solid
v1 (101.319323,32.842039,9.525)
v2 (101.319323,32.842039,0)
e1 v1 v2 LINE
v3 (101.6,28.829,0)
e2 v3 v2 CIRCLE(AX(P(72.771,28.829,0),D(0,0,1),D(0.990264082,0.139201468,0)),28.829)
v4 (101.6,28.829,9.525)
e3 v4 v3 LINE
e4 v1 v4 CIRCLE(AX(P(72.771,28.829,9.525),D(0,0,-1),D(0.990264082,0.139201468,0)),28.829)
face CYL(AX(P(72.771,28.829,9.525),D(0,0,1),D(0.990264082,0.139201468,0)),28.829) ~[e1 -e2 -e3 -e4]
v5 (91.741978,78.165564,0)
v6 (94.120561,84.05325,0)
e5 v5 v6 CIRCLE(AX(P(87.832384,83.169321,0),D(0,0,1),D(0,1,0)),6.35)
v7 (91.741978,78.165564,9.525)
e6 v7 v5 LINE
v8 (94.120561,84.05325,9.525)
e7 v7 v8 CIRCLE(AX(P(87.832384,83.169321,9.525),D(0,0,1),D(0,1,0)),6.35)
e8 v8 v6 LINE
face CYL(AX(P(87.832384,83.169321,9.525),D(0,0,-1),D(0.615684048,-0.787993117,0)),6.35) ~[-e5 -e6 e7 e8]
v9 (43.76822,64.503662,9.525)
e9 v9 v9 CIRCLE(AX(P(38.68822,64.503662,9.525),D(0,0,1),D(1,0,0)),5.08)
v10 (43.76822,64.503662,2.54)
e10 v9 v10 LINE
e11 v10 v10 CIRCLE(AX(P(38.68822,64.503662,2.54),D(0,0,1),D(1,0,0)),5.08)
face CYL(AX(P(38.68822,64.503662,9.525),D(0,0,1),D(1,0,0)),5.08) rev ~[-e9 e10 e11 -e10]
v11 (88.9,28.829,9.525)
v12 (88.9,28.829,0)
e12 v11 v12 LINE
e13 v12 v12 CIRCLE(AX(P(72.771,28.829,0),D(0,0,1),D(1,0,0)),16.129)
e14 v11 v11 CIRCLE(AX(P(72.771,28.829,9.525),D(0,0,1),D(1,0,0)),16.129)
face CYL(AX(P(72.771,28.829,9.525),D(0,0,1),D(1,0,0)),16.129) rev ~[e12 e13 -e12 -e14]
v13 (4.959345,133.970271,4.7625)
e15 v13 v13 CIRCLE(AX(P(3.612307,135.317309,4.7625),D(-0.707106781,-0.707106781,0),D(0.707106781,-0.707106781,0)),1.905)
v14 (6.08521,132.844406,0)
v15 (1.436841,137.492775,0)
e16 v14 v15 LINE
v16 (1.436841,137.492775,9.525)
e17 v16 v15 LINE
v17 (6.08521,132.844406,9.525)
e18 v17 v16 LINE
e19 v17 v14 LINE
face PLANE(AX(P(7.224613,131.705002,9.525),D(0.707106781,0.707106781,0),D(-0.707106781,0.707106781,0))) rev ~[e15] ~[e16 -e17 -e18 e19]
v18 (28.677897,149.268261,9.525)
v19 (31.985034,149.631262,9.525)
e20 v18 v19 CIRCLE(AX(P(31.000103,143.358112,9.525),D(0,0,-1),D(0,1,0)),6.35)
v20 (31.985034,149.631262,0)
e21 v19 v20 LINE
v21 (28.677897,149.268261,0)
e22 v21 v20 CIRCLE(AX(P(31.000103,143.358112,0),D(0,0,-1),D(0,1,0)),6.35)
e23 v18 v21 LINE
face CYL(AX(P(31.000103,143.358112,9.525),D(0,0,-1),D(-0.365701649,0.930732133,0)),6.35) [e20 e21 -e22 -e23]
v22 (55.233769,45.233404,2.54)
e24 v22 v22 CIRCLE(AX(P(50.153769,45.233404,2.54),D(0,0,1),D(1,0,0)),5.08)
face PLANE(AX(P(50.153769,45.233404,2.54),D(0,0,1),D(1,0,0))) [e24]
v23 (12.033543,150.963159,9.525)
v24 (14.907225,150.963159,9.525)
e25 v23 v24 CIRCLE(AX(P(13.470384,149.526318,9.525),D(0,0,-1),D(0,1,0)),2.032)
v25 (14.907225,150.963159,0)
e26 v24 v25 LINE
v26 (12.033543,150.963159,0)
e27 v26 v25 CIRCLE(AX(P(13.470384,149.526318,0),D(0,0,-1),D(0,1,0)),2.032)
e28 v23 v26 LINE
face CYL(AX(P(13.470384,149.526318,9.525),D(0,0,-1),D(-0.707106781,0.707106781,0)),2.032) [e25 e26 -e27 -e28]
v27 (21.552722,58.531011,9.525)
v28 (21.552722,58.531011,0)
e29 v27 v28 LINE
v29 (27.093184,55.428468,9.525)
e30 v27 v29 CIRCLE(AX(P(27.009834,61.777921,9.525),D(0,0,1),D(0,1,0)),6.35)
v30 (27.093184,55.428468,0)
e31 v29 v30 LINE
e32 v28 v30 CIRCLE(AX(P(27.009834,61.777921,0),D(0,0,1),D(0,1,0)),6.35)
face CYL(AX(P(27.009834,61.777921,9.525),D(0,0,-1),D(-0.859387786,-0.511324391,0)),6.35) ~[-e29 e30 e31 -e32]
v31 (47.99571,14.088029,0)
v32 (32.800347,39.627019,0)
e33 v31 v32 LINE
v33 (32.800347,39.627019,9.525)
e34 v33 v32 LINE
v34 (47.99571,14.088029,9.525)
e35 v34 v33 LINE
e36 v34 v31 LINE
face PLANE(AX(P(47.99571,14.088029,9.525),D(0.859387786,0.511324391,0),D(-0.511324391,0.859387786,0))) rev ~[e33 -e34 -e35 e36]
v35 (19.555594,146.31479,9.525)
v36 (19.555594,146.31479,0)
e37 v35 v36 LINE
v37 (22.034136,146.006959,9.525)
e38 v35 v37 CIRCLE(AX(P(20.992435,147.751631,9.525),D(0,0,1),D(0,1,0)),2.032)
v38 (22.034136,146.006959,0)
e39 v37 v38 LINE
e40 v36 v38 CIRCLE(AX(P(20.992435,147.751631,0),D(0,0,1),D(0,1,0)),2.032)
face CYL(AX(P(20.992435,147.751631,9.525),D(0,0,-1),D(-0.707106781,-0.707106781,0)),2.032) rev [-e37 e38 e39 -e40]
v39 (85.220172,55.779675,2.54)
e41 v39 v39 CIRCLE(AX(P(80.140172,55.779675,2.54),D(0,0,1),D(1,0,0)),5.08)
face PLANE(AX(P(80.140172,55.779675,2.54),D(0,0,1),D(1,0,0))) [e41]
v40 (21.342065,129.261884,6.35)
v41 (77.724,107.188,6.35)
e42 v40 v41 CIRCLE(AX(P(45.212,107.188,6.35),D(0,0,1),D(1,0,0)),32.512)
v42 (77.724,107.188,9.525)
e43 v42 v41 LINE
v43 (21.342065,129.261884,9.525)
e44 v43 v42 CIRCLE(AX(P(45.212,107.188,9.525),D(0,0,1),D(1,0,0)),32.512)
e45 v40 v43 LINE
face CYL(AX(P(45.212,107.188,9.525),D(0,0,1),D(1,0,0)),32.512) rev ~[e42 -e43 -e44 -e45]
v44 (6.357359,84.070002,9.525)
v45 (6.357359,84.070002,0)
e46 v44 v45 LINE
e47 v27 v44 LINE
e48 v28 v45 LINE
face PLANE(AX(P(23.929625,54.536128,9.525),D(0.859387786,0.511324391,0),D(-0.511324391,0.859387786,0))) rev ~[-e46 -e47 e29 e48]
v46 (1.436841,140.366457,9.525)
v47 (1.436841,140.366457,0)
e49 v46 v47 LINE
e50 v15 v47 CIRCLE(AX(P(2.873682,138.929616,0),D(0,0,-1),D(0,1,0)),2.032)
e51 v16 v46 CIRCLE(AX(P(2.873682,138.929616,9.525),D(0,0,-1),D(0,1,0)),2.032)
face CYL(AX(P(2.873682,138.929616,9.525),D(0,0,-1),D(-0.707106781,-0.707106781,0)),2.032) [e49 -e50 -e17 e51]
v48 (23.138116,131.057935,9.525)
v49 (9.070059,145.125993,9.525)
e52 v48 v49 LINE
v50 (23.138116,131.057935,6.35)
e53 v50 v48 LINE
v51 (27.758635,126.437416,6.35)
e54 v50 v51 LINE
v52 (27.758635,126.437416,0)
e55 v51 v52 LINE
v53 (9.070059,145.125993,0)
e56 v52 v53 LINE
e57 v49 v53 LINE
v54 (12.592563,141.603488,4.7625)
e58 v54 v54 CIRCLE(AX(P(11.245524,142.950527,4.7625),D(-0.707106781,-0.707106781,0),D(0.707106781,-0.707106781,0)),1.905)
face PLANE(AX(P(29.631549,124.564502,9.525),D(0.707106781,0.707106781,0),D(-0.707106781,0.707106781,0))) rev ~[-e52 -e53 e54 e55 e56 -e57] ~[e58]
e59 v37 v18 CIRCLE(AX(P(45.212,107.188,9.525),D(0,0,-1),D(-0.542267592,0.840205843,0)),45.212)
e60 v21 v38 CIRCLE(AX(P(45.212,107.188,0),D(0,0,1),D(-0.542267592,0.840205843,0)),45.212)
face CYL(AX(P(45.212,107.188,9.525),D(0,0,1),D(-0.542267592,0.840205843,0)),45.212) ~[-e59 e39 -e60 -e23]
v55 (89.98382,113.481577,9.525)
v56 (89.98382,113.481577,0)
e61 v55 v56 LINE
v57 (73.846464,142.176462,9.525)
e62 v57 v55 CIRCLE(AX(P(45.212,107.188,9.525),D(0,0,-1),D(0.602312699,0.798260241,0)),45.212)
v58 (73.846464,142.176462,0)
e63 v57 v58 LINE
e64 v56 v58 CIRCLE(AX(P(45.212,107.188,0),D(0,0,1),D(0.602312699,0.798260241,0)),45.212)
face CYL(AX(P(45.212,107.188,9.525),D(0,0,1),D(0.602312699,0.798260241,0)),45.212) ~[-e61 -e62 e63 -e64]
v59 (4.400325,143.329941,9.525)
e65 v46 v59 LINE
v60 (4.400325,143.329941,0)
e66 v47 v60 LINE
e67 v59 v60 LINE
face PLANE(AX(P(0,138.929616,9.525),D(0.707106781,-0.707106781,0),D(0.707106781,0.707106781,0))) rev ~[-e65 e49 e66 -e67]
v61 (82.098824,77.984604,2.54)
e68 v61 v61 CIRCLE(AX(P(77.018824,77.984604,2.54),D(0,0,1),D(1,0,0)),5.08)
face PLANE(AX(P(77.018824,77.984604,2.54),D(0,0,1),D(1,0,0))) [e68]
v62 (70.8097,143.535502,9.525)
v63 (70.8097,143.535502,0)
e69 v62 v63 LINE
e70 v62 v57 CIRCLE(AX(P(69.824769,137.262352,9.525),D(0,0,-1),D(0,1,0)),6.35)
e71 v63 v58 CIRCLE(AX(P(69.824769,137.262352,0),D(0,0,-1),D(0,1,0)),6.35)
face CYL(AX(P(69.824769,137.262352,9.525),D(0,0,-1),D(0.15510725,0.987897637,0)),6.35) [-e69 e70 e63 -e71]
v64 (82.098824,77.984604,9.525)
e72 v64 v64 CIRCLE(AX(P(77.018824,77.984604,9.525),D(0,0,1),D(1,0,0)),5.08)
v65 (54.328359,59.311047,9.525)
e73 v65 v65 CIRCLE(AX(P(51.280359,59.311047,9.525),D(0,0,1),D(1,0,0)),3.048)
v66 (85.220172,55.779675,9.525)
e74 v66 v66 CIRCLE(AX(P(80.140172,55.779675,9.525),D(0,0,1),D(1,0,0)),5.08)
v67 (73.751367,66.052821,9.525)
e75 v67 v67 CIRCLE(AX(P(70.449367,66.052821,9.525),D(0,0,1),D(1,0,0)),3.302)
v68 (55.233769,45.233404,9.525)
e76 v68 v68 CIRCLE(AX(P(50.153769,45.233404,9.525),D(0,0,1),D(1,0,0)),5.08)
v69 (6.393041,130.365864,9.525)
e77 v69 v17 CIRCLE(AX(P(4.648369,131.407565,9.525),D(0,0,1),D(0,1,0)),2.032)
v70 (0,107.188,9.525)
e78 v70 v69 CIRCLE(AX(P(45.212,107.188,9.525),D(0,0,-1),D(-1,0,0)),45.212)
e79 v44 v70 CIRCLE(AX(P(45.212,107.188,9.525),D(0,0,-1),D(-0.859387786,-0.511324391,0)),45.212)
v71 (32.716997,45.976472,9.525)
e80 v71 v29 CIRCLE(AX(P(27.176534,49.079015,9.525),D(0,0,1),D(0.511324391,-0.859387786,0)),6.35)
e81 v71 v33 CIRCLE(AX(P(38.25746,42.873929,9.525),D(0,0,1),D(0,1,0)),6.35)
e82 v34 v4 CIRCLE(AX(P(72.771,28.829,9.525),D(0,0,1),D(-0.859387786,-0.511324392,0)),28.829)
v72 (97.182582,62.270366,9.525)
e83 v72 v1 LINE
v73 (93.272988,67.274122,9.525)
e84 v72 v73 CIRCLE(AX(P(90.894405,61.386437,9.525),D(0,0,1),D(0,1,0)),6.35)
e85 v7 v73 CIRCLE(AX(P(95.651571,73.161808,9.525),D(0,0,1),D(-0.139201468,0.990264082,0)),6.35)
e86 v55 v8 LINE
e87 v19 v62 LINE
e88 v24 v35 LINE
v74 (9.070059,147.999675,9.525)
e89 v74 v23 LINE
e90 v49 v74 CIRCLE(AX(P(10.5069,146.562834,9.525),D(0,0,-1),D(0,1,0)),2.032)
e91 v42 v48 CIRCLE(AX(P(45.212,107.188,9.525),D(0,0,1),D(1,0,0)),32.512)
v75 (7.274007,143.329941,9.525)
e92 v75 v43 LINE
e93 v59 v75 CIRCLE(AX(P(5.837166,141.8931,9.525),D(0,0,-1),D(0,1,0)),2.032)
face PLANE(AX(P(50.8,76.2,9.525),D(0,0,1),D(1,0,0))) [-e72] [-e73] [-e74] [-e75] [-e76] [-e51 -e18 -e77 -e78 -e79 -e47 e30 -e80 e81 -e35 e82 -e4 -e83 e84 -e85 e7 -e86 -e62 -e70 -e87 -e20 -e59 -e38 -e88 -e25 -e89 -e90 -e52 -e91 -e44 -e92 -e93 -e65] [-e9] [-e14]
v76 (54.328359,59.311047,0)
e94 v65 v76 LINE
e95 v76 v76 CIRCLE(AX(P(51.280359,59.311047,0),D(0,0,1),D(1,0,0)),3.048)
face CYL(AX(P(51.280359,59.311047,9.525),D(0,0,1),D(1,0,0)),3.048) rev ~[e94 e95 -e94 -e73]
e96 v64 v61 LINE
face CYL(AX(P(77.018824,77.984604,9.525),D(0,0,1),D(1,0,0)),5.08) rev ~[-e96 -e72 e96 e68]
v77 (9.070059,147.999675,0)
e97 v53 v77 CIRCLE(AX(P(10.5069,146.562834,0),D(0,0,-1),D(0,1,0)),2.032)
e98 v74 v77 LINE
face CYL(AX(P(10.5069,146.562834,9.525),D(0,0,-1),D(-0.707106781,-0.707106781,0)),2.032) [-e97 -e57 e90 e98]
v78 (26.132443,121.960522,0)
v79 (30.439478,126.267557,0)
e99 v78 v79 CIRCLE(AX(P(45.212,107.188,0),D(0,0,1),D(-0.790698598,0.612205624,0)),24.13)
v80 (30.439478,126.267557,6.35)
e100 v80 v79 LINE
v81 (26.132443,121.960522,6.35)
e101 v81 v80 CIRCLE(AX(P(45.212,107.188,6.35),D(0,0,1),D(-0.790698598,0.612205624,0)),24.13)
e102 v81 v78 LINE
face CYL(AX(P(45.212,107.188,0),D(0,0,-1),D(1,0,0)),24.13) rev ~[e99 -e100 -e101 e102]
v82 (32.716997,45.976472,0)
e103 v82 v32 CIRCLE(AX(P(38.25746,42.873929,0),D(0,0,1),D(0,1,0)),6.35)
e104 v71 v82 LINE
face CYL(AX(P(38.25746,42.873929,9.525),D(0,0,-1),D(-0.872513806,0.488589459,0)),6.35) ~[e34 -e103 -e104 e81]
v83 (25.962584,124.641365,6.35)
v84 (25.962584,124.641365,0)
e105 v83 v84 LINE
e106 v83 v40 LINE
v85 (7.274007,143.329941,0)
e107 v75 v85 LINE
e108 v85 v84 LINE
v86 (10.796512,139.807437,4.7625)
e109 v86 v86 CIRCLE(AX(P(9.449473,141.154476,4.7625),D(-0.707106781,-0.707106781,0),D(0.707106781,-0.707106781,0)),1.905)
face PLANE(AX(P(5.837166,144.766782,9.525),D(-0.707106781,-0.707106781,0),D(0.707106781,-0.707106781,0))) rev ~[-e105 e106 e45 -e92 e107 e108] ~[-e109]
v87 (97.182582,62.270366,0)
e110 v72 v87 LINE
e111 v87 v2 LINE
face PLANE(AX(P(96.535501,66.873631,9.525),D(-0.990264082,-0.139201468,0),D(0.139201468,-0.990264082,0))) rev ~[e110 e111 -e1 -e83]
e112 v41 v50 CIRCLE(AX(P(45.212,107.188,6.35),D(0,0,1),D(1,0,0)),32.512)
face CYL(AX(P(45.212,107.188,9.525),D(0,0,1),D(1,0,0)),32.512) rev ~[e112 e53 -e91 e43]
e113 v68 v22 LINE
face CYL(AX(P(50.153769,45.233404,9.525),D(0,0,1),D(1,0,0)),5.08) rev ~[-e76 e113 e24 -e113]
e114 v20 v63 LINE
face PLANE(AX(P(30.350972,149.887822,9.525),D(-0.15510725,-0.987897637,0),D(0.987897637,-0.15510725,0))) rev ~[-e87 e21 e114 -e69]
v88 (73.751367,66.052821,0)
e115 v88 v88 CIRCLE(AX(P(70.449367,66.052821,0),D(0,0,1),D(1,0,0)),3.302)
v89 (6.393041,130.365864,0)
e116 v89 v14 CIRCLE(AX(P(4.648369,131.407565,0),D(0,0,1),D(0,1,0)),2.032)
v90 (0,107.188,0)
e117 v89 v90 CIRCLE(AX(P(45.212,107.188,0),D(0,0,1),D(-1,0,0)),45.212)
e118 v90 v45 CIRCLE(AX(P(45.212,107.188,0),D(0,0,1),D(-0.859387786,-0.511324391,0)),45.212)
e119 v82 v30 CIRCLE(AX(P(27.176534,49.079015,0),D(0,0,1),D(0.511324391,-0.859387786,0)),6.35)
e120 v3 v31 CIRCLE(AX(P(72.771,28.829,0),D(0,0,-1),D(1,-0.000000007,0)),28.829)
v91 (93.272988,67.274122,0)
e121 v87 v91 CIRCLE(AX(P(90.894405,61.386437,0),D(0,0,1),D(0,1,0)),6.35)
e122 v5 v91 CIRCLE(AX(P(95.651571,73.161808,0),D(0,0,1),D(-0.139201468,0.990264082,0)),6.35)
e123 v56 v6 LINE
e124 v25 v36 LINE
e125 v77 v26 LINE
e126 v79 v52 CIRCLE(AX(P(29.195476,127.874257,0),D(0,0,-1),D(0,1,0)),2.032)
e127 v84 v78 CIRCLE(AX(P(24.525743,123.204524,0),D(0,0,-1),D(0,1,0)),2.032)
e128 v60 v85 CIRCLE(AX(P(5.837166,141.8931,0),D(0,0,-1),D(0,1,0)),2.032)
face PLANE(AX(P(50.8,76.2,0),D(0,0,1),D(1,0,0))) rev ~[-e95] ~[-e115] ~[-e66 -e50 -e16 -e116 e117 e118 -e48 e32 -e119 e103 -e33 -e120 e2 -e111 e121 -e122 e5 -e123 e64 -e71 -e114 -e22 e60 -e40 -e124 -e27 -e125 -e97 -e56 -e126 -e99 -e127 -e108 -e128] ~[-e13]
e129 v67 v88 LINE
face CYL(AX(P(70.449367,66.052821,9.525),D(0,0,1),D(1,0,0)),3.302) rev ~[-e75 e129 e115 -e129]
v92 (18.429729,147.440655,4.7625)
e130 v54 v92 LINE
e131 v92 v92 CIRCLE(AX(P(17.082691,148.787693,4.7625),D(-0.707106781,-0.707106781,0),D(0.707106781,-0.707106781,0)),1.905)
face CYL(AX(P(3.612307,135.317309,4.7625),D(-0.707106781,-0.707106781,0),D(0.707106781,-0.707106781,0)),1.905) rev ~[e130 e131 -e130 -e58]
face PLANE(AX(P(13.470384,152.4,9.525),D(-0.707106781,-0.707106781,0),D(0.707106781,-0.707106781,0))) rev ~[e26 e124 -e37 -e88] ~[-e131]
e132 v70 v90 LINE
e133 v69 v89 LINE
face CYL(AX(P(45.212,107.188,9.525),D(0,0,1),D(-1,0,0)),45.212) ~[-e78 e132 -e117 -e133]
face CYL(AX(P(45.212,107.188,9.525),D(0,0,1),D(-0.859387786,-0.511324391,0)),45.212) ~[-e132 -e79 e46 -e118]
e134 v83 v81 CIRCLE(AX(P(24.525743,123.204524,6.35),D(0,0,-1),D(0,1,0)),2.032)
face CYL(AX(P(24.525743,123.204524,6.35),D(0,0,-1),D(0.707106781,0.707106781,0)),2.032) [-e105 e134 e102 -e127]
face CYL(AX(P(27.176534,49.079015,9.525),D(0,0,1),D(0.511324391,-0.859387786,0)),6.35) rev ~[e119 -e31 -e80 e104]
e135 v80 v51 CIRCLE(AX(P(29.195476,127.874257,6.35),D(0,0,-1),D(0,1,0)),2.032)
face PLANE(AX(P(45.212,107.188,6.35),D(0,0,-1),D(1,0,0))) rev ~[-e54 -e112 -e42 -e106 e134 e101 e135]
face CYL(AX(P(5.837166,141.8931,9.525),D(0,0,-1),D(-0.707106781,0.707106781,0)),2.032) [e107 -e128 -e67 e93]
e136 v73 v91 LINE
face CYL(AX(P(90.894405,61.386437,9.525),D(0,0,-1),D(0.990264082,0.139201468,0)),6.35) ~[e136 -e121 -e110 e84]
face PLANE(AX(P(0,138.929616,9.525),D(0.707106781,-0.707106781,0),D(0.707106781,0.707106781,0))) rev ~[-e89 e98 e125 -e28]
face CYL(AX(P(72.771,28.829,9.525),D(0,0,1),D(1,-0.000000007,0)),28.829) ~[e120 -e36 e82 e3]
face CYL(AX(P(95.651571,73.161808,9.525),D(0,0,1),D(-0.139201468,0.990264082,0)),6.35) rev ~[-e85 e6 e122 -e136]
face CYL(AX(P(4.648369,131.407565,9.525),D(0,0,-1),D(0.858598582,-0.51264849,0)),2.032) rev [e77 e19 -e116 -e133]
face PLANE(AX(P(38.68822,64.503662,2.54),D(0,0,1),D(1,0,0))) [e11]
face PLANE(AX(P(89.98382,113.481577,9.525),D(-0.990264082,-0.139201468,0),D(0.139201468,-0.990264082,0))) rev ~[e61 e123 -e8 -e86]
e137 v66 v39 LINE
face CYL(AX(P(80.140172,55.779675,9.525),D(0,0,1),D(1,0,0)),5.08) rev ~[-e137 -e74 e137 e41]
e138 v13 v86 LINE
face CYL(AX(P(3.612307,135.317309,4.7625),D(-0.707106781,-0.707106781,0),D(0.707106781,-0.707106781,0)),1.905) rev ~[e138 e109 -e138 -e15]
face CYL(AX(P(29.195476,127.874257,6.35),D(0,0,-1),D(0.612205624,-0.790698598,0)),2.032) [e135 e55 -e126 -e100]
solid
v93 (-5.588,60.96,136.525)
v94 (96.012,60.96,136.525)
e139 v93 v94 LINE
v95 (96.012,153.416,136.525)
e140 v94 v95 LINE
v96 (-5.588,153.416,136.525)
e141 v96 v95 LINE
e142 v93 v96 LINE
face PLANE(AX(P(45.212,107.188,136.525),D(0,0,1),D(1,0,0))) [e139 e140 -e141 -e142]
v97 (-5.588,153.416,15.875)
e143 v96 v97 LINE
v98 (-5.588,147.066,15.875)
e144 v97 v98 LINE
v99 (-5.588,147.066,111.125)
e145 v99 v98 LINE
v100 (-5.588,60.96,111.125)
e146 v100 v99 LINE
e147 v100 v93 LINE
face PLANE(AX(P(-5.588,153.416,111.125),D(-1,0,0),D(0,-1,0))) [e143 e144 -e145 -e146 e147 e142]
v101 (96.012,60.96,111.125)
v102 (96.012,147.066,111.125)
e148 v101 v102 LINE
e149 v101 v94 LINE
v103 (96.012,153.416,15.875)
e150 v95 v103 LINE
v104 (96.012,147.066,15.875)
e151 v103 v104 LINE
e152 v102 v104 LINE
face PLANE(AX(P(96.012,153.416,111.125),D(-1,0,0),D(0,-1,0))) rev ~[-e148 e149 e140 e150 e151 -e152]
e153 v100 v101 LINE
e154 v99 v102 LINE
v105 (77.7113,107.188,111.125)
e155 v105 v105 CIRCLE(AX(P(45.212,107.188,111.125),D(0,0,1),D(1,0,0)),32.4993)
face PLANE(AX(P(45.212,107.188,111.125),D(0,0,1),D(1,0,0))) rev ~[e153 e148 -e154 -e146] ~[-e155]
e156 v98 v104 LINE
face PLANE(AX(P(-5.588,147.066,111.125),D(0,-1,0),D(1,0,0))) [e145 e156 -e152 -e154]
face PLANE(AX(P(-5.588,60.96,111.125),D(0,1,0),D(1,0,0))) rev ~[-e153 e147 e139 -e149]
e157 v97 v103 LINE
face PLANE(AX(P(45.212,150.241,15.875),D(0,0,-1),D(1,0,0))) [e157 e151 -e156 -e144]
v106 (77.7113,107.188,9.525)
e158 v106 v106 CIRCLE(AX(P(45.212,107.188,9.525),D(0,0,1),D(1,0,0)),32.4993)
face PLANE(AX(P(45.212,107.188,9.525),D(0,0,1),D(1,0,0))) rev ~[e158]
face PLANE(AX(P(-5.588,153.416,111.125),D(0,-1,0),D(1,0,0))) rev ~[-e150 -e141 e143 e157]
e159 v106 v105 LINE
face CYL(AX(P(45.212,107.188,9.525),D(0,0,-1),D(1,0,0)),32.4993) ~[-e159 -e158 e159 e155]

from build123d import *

# Parameters (mm, degrees)
F0_W      = 101.6
F0_H      = 152.4
F1_DEPTH  = 9.525
F2_R      = 32.512
F2_R_2    = 16.129
F3_DEPTH  = 25.4
F5_DEPTH  = 25.4
F6_R      = 33.02
F6_R_2    = 24.13
F7_DEPTH  = 6.35
F9_DEPTH  = 25.4
F10_R     = 1.905
F11_DEPTH = 25.4
F12_R     = 5.08
F13_DEPTH = 6.985
F14_R     = 3.302
F14_R_2   = 3.048
F15_DEPTH = 25.4
F16_R     = 32.4993
F17_DEPTH = 101.6
F18_W     = 101.6
F18_H     = 92.456
F19_DEPTH = 25.4
F20_W     = 101.6
F20_H     = 6.35
F21_DEPTH = 95.25
F22_R     = 6.35
F23_R     = 2.032


with BuildPart() as f1:
    # F0 (on Top) → F1 (new body)
    with BuildSketch(Plane.XY):
        with Locations((50.8, 76.2)):
            Rectangle(F0_W, F0_H)
    extrude(amount=F1_DEPTH)

    # F2 (on face) → F3 (cut)
    with BuildSketch(Plane.XY.offset(9.525)):
        with Locations((45.212, 107.188)):
            Circle(F2_R)
        with Locations((72.771, 28.829)):
            Circle(F2_R_2)
    extrude(amount=-F3_DEPTH, mode=Mode.SUBTRACT)

    # F4 (on face) → F5 (cut)
    with BuildSketch(Plane.XY.offset(9.525)):
        with BuildLine():
            Line((0, 0), (72.7710000733, 0))
            ThreePointArc((72.7710000733, 0), (58.5206703615, 3.768286798), (47.9957095185, 14.0880291175))
            Line((47.9957095185, 14.0880291175), (30.4234443558, 43.6219029237))
            ThreePointArc((30.4234443558, 43.6219029237), (32.6336469107, 52.3259252506), (23.9296245838, 54.5361278054))
            Line((23.9296245838, 54.5361278054), (6.3573594211, 84.0700016116))
            ThreePointArc((6.3573594211, 84.0700016116), (1.6183023256, 95.1999031088), (0, 107.188))
            Line((0, 107.188), (0, 0))
        make_face()
        with BuildLine():
            Line((7.2246134342, 131.7050023841), (0, 138.9296158184))
            Line((0, 138.9296158184), (0, 107.188))
            ThreePointArc((0, 107.188), (1.8437474101, 119.9676561493), (7.2246134342, 131.7050023841))
        make_face()
        Polygon((0, 138.9296158184), (13.4703841816, 152.4), (0, 152.4), align=None)
        with BuildLine():
            ThreePointArc((72.4437617696, 143.2789420066), (84.1747986467, 130.1232406923), (89.9838196578, 113.4815767678))
            Line((89.9838196578, 113.4815767678), (94.7676421119, 79.4499848615))
            ThreePointArc((94.7676421119, 79.4499848615), (89.363394515, 72.277878622), (96.5355007546, 66.8736310251))
            Line((96.5355007546, 66.8736310251), (101.3193232087, 32.8420391188))
            ThreePointArc((101.3193232087, 32.8420391188), (101.5297452052, 30.8404211947), (101.6, 28.8289998081))
            Line((101.6, 28.8289998081), (101.6, 152.4))
            Line((101.6, 152.4), (13.4703841816, 152.4))
            Line((13.4703841816, 152.4), (20.6949976159, 145.1753865658))
            ThreePointArc((20.6949976159, 145.1753865658), (25.3824997549, 147.8194639661), (30.3509720516, 149.8878219237))
            Line((30.3509720516, 149.8878219237), (72.4437617696, 143.2789420066))
        make_face()
        with BuildLine():
            Line((101.6, 0), (101.6, 28.8289998081))
            ThreePointArc((101.6, 28.8289998081), (93.1561813529, 8.4438185632), (72.7710000733, 0))
            Line((72.7710000733, 0), (101.6, 0))
        make_face()
    extrude(amount=-F5_DEPTH, mode=Mode.SUBTRACT)

    # F6 (on face) → F7 (join)
    with BuildSketch(Plane(origin=(0, 0, 0), x_dir=(1, 0, 0), z_dir=(0, 0, -1))):
        with Locations((45.212, -107.188)):
            Circle(F6_R)
        with Locations((45.212, -107.188)):
            Circle(F6_R_2, mode=Mode.SUBTRACT)
    extrude(amount=-F7_DEPTH)

    # F8 (on face) → F9 (cut)
    with BuildSketch(Plane.XY.offset(9.525)):
        Polygon((29.6315491221, 124.5645021021), (7.6332177029, 146.5628335213), (5.8371664787, 144.7667822971), (27.8354978979, 122.7684508779), align=None)
    extrude(amount=-F9_DEPTH, mode=Mode.SUBTRACT)

    # F10 (on face) → F11 (cut)
    with BuildSketch(Plane(origin=(69.4648079092, 69.4648079092, 0), x_dir=(0.7071067812, -0.7071067812, 0), z_dir=(-0.7071067812, -0.7071067812, 0))):
        with Locations((-93.129500302, 4.7625)):
            Circle(F10_R)
    extrude(amount=-F11_DEPTH, mode=Mode.SUBTRACT)

    # F12 (on face) → F13 (cut)
    with BuildSketch(Plane.XY.offset(9.525)):
        with Locations((38.6882198833, 64.5036622051)):
            Circle(F12_R)
        with Locations((77.0188242242, 77.9846040883)):
            Circle(F12_R)
        with Locations((80.1401720853, 55.7796753677)):
            Circle(F12_R)
        with Locations((50.1537692021, 45.2334040134)):
            Circle(F12_R)
    extrude(amount=-F13_DEPTH, mode=Mode.SUBTRACT)

    # F14 (on face) → F15 (cut)
    with BuildSketch(Plane.XY.offset(9.525)):
        with Locations((70.4493668127, 66.0528214254)):
            Circle(F14_R)
        with Locations((51.2803585402, 59.3110470411)):
            Circle(F14_R_2)
    extrude(amount=-F15_DEPTH, mode=Mode.SUBTRACT)

    # F22
    f22_edges = [f1.edges().sort_by_distance(p)[0] for p in [
        (94.767642, 79.449985, 4.7625),
        (96.535501, 66.873631, 4.7625),
        (23.929625, 54.536128, 4.7625),
        (30.423444, 43.621903, 4.7625),
        (72.443762, 143.278942, 4.7625),
        (30.350972, 149.887822, 4.7625),
    ]]
    fillet(f22_edges, radius=F22_R)

    # F23
    f23_edges = [f1.edges().sort_by_distance(p)[0] for p in [
        (7.633218, 146.562834, 4.7625),
        (5.837166, 144.766782, 4.7625),
        (7.224613, 131.705002, 4.7625),
        (20.694998, 145.175387, 4.7625),
        (27.275136, 123.328812, 3.175),
        (29.071188, 125.124864, 3.175),
        (0, 138.929616, 4.7625),
        (13.470384, 152.4, 4.7625),
    ]]
    fillet(f23_edges, radius=F23_R)


with BuildPart() as f17:
    # F16 (on face) → F17 (new body)
    with BuildSketch(Plane.XY.offset(9.525)):
        with Locations((45.212, 107.188)):
            Circle(F16_R)
    extrude(amount=F17_DEPTH)

    # F18 (on face) → F19 (join)
    with BuildSketch(Plane.XY.offset(111.125)):
        with Locations((45.212, 107.188)):
            Rectangle(F18_W, F18_H)
    extrude(amount=F19_DEPTH)

    # F20 (on face) → F21 (join)
    with BuildSketch(Plane(origin=(0, 0, 111.125), x_dir=(1, 0, 0), z_dir=(0, 0, -1))):
        with Locations((45.212, -150.241)):
            Rectangle(F20_W, F20_H)
    extrude(amount=F21_DEPTH)


solid = Compound([f1.part, f17.part])
